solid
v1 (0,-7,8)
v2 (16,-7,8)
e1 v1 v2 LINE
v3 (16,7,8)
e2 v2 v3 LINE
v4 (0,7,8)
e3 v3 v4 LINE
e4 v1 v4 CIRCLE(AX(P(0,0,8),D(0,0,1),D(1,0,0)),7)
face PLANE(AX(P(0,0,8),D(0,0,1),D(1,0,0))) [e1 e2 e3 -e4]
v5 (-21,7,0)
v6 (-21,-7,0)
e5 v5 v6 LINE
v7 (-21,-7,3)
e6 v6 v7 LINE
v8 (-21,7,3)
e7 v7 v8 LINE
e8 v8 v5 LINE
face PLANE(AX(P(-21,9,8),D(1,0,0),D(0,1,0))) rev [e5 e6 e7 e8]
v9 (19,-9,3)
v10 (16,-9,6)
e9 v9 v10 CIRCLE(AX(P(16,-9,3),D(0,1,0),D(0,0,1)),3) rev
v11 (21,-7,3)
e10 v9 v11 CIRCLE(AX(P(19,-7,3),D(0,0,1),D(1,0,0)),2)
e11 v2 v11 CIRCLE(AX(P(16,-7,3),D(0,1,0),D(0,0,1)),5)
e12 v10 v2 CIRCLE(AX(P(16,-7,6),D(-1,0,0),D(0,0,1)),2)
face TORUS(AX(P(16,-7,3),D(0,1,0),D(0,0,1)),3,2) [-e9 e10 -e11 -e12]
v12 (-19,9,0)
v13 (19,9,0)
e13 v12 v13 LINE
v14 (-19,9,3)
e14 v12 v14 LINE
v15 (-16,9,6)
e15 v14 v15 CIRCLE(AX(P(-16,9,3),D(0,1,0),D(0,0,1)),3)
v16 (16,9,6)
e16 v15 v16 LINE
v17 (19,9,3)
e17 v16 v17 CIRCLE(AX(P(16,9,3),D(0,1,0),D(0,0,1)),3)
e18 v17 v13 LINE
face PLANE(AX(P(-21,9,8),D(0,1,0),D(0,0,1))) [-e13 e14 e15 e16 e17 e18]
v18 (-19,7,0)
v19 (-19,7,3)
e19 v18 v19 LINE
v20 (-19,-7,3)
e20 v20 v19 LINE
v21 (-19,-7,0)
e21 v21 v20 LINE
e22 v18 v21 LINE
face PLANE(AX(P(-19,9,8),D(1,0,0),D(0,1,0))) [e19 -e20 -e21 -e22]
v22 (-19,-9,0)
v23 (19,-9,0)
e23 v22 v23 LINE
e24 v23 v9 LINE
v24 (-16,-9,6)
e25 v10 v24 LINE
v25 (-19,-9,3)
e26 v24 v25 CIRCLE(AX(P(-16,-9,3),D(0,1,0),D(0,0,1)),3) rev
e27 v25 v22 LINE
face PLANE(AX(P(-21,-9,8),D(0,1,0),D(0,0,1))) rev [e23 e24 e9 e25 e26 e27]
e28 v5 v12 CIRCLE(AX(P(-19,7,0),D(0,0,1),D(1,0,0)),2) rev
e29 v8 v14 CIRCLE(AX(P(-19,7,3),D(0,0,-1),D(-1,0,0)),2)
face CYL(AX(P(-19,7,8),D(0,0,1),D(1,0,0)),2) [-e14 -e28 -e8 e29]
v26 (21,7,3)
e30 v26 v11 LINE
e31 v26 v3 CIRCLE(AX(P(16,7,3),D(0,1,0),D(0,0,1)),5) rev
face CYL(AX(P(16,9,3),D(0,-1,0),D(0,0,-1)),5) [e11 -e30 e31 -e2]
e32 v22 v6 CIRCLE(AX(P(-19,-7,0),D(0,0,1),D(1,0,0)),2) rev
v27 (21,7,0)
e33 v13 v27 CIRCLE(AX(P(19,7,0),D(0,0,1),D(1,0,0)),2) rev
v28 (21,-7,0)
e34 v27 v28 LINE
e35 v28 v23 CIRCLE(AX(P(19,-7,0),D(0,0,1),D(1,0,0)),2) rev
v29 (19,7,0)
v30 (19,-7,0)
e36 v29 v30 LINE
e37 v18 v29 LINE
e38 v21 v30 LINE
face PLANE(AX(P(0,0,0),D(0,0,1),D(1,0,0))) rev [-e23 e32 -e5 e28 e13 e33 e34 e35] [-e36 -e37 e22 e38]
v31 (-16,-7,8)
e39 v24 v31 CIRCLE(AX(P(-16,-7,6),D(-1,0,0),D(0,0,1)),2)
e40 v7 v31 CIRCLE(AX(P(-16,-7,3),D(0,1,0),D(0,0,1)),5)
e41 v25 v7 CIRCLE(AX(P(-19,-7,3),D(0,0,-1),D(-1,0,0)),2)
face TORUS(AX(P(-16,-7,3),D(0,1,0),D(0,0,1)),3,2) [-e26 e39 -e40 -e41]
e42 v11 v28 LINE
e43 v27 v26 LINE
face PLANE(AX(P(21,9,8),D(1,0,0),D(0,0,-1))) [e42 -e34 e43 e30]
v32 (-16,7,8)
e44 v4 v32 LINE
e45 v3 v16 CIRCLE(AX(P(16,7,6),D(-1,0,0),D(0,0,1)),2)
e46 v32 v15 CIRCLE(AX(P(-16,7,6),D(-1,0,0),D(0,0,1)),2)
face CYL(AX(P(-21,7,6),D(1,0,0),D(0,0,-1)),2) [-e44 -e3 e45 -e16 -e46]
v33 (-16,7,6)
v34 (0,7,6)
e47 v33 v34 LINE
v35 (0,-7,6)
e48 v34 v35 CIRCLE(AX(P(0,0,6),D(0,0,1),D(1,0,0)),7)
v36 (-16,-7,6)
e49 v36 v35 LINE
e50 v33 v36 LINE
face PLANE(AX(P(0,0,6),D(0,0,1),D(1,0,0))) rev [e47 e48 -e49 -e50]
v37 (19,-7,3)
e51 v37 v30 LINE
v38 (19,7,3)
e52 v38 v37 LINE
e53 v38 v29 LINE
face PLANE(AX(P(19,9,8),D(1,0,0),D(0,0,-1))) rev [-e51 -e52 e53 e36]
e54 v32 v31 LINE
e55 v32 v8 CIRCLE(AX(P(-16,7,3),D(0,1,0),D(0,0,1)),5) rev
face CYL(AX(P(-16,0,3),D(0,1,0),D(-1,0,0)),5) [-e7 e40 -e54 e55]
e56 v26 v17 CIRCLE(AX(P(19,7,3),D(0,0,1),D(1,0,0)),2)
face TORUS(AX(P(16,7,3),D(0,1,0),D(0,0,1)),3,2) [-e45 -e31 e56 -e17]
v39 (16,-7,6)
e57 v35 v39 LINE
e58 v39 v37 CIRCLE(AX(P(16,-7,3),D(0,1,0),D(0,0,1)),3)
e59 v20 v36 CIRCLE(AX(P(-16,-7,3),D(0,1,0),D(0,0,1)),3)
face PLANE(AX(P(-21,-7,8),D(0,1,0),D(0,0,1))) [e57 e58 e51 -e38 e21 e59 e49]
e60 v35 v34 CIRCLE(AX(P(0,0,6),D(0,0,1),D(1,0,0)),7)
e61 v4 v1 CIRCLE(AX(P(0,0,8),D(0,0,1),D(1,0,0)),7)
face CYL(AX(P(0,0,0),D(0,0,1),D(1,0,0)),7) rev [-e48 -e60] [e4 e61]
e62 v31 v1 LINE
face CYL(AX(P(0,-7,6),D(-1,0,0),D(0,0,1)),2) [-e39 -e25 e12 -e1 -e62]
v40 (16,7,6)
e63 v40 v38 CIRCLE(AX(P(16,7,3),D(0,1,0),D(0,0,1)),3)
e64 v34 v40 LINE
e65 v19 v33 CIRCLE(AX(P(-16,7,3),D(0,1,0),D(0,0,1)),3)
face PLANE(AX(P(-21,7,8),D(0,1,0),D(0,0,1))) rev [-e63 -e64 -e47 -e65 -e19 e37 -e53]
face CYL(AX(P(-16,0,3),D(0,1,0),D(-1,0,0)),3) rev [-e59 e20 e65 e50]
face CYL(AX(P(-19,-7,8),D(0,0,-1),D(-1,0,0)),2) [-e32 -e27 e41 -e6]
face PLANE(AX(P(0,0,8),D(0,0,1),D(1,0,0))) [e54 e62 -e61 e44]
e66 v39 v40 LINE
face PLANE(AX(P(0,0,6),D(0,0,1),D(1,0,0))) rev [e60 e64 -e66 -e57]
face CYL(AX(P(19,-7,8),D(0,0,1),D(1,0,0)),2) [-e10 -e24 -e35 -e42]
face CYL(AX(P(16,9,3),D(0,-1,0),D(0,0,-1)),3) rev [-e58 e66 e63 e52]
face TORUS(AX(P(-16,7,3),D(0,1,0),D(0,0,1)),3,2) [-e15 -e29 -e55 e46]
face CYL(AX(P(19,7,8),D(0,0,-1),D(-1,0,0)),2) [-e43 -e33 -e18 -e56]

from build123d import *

# Parameters (mm, degrees)
SKETCH1_W           = 42
SKETCH1_H           = 18
BOSS_EXTRUDE1_DEPTH = 8
FILLET1_R           = 5
FILLET2_R           = 2
SHELL1_START        = -7
SHELL1_DEPTH        = 14
SKETCH2_R           = 7
CUT_EXTRUDE1_DEPTH  = 25.207436874


# Read off the part's stored shape, not the designer's step: Shell1
with BuildPart() as part:
    # Sketch1 → Boss-Extrude1 (new body)
    with BuildSketch(Plane.XY):
        Rectangle(SKETCH1_W, SKETCH1_H)
    extrude(amount=BOSS_EXTRUDE1_DEPTH)

    # Fillet1
    fillet1_edges = [part.edges().sort_by_distance(p)[0] for p in [
        (21, 0, 8),
        (-21, 0, 8),
    ]]
    fillet(fillet1_edges, radius=FILLET1_R)

    # Fillet2
    fillet2_edges = [part.edges().sort_by_distance(p)[0] for p in [
        (0, -9, 8),
        (0, 9, 8),
        (21, -9, 1.5),
        (-21, -9, 1.5),
        (19.535533906, -9, 6.535533906),
        (-19.535533906, -9, 6.535533906),
        (-21, 9, 1.5),
        (21, 9, 1.5),
        (19.535533906, 9, 6.535533906),
        (-19.535533906, 9, 6.535533906),
    ]]
    fillet(fillet2_edges, radius=FILLET2_R)

    # Shell1 outline → Shell1 (cut)
    with BuildSketch(Plane(origin=(0, 0, 0), x_dir=(1, 0, 0), z_dir=(0, 1, 0)).offset(SHELL1_START)):
        with BuildLine():
            Line((-19, 0), (-19, -3))
            ThreePointArc((-19, -3), (-18.121320344, -5.121320344), (-16, -6))
            Line((-16, -6), (16, -6))
            ThreePointArc((16, -6), (18.121320344, -5.121320344), (19, -3))
            Line((19, -3), (19, 0))
            Line((19, 0), (-19, 0))
        make_face()
    extrude(amount=SHELL1_DEPTH, mode=Mode.SUBTRACT)

    # Sketch2 → Cut-Extrude1 (cut, through all)
    with BuildSketch(Plane.XY.offset(8)):
        with Locations(Location((0, 0, 0), (0, 0, 270))):
            Circle(SKETCH2_R)
    extrude(amount=-CUT_EXTRUDE1_DEPTH, mode=Mode.SUBTRACT)


solid = part.part
